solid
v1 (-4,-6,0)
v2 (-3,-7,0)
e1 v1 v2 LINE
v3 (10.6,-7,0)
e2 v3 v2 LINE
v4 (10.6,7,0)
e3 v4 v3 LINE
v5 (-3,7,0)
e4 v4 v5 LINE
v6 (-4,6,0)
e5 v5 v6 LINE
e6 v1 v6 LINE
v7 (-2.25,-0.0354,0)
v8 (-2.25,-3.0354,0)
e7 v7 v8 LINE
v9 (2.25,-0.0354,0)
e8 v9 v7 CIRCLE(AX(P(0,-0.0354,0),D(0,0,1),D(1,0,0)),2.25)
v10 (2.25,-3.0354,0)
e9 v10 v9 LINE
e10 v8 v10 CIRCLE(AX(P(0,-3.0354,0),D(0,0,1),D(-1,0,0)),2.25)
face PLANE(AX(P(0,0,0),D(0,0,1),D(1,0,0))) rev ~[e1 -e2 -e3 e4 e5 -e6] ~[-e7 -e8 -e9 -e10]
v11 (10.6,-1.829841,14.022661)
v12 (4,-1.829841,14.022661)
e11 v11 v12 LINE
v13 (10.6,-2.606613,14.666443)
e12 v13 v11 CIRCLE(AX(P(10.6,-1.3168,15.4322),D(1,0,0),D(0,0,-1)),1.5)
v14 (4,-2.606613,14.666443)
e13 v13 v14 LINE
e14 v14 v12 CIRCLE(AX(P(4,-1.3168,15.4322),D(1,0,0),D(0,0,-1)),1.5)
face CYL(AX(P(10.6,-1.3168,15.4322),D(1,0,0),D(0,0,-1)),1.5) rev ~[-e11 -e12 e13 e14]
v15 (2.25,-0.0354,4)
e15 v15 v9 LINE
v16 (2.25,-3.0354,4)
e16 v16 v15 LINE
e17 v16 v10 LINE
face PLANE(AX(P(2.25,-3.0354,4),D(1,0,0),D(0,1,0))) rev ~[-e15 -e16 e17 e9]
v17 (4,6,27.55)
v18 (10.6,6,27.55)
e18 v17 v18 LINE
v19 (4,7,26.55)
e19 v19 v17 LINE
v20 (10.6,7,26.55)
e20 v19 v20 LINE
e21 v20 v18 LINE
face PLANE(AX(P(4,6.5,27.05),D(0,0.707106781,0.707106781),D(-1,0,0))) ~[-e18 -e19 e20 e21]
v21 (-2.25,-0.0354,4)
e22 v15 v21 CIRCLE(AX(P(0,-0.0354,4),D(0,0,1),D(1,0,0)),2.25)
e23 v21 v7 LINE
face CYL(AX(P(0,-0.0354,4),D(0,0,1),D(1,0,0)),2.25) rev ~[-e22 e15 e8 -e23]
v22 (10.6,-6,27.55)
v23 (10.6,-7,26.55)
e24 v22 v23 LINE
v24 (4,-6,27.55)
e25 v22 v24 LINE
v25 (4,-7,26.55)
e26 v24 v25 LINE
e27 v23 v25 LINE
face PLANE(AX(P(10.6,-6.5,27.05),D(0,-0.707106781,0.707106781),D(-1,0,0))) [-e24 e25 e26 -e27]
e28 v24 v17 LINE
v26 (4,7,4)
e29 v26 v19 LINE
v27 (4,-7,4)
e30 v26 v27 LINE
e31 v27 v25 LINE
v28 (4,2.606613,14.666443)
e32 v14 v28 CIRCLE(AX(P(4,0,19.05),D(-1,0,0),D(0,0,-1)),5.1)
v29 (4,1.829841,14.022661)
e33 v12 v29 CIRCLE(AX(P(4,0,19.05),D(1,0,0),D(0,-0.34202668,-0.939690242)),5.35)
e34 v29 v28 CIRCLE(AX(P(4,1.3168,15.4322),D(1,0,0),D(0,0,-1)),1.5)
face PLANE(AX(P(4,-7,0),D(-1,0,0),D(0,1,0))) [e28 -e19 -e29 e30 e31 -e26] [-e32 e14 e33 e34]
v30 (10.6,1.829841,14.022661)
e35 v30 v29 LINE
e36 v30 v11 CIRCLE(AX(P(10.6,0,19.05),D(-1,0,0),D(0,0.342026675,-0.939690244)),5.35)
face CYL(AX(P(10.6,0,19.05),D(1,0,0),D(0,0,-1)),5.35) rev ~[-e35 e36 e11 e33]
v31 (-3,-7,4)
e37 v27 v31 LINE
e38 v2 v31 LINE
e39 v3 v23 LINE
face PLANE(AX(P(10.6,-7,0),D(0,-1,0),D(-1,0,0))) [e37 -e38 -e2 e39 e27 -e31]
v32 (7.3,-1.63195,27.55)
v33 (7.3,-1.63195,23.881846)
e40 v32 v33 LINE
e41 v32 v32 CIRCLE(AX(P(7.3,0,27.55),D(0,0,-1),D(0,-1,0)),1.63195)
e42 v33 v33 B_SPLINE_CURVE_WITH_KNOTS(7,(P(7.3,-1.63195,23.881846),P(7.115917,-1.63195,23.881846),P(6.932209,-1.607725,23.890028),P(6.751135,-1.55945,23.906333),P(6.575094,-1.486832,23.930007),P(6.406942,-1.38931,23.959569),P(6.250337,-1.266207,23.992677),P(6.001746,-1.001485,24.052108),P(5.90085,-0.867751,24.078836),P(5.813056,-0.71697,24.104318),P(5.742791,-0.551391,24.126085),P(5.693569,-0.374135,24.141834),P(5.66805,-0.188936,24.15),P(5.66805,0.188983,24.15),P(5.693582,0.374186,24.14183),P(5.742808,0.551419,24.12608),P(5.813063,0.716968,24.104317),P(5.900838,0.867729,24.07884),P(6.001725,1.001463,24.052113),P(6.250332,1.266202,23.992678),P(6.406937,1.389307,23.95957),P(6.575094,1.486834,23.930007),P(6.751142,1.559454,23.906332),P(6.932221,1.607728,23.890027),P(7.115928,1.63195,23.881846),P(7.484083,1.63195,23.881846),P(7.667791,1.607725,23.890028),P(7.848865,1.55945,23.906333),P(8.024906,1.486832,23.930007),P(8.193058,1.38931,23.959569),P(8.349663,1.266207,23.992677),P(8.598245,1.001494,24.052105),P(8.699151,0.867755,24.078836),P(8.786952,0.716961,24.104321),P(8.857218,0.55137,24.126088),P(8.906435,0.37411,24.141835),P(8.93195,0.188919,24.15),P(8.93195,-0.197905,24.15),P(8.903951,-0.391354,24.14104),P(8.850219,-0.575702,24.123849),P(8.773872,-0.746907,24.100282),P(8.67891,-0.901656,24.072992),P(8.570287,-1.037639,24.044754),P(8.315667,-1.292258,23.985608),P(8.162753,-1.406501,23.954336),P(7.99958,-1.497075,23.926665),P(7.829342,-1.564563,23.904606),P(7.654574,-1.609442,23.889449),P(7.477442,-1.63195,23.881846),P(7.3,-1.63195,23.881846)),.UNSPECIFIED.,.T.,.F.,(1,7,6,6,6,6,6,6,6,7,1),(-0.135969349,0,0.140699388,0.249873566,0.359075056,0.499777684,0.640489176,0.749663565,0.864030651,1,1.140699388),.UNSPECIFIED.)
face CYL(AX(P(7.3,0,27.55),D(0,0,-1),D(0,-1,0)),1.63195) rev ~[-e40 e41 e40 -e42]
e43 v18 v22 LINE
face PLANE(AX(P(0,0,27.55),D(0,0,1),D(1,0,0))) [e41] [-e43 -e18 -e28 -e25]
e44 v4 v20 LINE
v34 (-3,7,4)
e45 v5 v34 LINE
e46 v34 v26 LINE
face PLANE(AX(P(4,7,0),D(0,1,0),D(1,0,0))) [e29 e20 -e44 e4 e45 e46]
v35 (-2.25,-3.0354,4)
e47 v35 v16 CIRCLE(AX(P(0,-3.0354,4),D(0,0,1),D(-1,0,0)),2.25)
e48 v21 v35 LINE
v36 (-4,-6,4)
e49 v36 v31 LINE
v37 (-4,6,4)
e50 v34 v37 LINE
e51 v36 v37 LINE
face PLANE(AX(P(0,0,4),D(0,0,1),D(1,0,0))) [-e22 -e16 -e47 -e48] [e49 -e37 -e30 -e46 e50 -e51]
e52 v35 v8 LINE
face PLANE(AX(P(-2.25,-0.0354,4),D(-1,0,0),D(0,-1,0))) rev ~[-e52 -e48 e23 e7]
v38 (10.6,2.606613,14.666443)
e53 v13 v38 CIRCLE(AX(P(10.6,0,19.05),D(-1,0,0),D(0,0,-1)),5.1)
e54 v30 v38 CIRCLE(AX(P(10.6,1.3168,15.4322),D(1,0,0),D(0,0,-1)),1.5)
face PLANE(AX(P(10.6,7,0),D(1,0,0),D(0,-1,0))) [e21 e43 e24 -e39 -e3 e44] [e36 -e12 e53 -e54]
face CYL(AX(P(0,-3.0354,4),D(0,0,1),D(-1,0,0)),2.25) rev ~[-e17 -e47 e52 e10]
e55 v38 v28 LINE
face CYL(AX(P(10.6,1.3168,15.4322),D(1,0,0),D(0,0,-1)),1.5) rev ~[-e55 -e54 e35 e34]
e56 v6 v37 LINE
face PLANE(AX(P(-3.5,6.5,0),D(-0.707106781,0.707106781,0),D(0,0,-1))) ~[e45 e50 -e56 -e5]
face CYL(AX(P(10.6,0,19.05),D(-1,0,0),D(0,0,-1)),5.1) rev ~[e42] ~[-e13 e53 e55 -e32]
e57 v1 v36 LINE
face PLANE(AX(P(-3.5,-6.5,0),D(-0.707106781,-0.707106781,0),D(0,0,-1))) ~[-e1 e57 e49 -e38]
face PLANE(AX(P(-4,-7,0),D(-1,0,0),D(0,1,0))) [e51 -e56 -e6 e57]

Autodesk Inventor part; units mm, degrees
ref_plane "YZ Plane" through (0, 0, 0) normal (1, 0, 0) x (0, 1, 0)
ref_plane "XZ Plane" through (0, 0, 0) normal (0, 1, 0) x (-1, 0, 0)
ref_plane "XY Plane" through (0, 0, 0) normal (0, 0, 1) x (1, 0, 0)
sketch "Sketch1" plane through (0, 0, 0) normal (0, 0, 1) x (1, 0, 0)
  line L0 (-4, 7) -> (4, 7)
  line L1 (4, 7) -> (4, -7)
  line L2 (4, -7) -> (-4, -7)
  line L3 (-4, -7) -> (-4, 7)
  point P0 (0, 0)
  dimension "WIDTH" = 14
  dimension "d1" = 7
  dimension "d2" = 4
  dimension "LENGTH" = 8
extrude "Extrusion1" add sketch "Sketch1" along normal blind 4
sketch "Sketch2" plane through (0, 0, 4) normal (0, 0, 1) x (1, 0, 0)
  line L0 (0, -3.0354) -> (0, -0.0354) construction
  line L1 (2.25, -3.0354) -> (2.25, -0.0354)
  line L2 (-2.25, -0.0354) -> (-2.25, -3.0354)
  arc A0 (-2.25, -3.0354) -> (2.25, -3.0354) centre (0, -3.0354) ccw
  arc A1 (2.25, -0.0354) -> (-2.25, -0.0354) centre (0, -0.0354) ccw
  point P0 (0, -1.5354)
  point P1 (0, 0)
  dimension "d44" = 0
  dimension "d45" = 1.5354
  dimension "d55" = 2.25
  dimension "d56" = 3
extrude "Extrusion3" cut sketch "Sketch2" against normal through all
sketch "Sketch3" plane through (0, 0, 0) normal (0, 0, 1) x (1, 0, 0)
  line L0 (4, 7) -> (10.6, 7)
  line L1 (10.6, 7) -> (10.6, -7)
  line L2 (10.6, -7) -> (4, -7)
  line L3 (4, -7) -> (4, 7)
  line L4 (4, -7) -> (4, 7) projected
  line L5 (4, 7) -> (-4, 7) projected
  point P0 (0, 0)
  dimension "d15" = 0
  dimension "d16" = 0
  dimension "d17" = 6.6
  dimension "d18" = 14
extrude "Extrusion2" add sketch "Sketch3" along normal blind 27.55
sketch "Sketch4" plane through (10.6, -7, 0) normal (1, 0, 0) x (0, 0, -1)
  point P0 (0, 7)
  point P1 (-19.05, 7)
  dimension "d28" = 0
  dimension "d29" = 19.05
hole "Hole2" at (10.6, 0, 19.05) direction (-1, 0, 0) diameter 10.2 end through all
sketch "Sketch5" plane through (0, 0, 27.55) normal (0, 0, 1) x (1, 0, 0)
  line L0 (10.6, -7) -> (10.6, 7) projected
  point P0 (0, 0)
  point P1 (7.3, 0)
  dimension "d37" = 0
  dimension "d38" = 3.3
hole "Hole3" at (7.3, 0, 27.55) direction (0, 0, -1) diameter 3.2639 end up to surface
chamfer "Chamfer1" distance 1 angle 45 4 edges at (7.3, 7, 27.55) (7.3, -7, 27.55) (-4, -7, 2) (-4, 7, 2)
sketch "Sketch7" plane through (10.6, -7, 0) normal (1, 0, 0) x (0, 0, -1)
  circle A0 centre (-19.05, 7) radius 5.35
  circle A1 centre (-19.05, 7) radius 5.1 projected
  circle A2 centre (-15.4322, 5.6832) radius 1.5
  circle A3 centre (-15.4322, 8.3168) radius 1.5
  line L0 (-15.4322, 5.6832) -> (-19.05, 7)
  line L1 (-19.05, 7) -> (-15.4322, 8.3168)
  line L2 (-19.05, 7) -> (-13.7, 7)
  point P0 (0, 7)
  point P1 (-14.0226, 8.8298)
  point P2 (-14.6664, 9.6066)
  point P3 (-14.6664, 4.3934)
  point P4 (-14.0226, 5.1702)
  dimension "d61" = 10.7
  dimension "d59" = 0
  dimension "d60" = 0
  dimension "d62" = 3
  dimension "d63" = 3
  dimension "d65" = 3.85
  dimension "d66" = 3.85
  dimension "d67" = 20
  dimension "d68" = 20
extrude "Extrusion4" cut sketch "Sketch7" against normal through all contours L2 A1 A3 A0 | A0 A2 A1 L2 | A3 A1 | A2 A1
equation "\"d1\" = 0.5 * WIDTH"
equation "\"d2\" = 0.5 * LENGTH"
equation "\"d18\" = WIDTH"
equation "\"d29\" = BEAM_HEIGHT"
equation "\"d38\" = 0.5 * d17"
equation "\"d65\" = 0.5 * d61 - 0.5 * d62"
equation "\"d66\" = 0.5 * d61 - 0.5 * d62"
equation "\"BEAM_HEIGHT\" = 19.05"
properties part number "shutter-mount"
